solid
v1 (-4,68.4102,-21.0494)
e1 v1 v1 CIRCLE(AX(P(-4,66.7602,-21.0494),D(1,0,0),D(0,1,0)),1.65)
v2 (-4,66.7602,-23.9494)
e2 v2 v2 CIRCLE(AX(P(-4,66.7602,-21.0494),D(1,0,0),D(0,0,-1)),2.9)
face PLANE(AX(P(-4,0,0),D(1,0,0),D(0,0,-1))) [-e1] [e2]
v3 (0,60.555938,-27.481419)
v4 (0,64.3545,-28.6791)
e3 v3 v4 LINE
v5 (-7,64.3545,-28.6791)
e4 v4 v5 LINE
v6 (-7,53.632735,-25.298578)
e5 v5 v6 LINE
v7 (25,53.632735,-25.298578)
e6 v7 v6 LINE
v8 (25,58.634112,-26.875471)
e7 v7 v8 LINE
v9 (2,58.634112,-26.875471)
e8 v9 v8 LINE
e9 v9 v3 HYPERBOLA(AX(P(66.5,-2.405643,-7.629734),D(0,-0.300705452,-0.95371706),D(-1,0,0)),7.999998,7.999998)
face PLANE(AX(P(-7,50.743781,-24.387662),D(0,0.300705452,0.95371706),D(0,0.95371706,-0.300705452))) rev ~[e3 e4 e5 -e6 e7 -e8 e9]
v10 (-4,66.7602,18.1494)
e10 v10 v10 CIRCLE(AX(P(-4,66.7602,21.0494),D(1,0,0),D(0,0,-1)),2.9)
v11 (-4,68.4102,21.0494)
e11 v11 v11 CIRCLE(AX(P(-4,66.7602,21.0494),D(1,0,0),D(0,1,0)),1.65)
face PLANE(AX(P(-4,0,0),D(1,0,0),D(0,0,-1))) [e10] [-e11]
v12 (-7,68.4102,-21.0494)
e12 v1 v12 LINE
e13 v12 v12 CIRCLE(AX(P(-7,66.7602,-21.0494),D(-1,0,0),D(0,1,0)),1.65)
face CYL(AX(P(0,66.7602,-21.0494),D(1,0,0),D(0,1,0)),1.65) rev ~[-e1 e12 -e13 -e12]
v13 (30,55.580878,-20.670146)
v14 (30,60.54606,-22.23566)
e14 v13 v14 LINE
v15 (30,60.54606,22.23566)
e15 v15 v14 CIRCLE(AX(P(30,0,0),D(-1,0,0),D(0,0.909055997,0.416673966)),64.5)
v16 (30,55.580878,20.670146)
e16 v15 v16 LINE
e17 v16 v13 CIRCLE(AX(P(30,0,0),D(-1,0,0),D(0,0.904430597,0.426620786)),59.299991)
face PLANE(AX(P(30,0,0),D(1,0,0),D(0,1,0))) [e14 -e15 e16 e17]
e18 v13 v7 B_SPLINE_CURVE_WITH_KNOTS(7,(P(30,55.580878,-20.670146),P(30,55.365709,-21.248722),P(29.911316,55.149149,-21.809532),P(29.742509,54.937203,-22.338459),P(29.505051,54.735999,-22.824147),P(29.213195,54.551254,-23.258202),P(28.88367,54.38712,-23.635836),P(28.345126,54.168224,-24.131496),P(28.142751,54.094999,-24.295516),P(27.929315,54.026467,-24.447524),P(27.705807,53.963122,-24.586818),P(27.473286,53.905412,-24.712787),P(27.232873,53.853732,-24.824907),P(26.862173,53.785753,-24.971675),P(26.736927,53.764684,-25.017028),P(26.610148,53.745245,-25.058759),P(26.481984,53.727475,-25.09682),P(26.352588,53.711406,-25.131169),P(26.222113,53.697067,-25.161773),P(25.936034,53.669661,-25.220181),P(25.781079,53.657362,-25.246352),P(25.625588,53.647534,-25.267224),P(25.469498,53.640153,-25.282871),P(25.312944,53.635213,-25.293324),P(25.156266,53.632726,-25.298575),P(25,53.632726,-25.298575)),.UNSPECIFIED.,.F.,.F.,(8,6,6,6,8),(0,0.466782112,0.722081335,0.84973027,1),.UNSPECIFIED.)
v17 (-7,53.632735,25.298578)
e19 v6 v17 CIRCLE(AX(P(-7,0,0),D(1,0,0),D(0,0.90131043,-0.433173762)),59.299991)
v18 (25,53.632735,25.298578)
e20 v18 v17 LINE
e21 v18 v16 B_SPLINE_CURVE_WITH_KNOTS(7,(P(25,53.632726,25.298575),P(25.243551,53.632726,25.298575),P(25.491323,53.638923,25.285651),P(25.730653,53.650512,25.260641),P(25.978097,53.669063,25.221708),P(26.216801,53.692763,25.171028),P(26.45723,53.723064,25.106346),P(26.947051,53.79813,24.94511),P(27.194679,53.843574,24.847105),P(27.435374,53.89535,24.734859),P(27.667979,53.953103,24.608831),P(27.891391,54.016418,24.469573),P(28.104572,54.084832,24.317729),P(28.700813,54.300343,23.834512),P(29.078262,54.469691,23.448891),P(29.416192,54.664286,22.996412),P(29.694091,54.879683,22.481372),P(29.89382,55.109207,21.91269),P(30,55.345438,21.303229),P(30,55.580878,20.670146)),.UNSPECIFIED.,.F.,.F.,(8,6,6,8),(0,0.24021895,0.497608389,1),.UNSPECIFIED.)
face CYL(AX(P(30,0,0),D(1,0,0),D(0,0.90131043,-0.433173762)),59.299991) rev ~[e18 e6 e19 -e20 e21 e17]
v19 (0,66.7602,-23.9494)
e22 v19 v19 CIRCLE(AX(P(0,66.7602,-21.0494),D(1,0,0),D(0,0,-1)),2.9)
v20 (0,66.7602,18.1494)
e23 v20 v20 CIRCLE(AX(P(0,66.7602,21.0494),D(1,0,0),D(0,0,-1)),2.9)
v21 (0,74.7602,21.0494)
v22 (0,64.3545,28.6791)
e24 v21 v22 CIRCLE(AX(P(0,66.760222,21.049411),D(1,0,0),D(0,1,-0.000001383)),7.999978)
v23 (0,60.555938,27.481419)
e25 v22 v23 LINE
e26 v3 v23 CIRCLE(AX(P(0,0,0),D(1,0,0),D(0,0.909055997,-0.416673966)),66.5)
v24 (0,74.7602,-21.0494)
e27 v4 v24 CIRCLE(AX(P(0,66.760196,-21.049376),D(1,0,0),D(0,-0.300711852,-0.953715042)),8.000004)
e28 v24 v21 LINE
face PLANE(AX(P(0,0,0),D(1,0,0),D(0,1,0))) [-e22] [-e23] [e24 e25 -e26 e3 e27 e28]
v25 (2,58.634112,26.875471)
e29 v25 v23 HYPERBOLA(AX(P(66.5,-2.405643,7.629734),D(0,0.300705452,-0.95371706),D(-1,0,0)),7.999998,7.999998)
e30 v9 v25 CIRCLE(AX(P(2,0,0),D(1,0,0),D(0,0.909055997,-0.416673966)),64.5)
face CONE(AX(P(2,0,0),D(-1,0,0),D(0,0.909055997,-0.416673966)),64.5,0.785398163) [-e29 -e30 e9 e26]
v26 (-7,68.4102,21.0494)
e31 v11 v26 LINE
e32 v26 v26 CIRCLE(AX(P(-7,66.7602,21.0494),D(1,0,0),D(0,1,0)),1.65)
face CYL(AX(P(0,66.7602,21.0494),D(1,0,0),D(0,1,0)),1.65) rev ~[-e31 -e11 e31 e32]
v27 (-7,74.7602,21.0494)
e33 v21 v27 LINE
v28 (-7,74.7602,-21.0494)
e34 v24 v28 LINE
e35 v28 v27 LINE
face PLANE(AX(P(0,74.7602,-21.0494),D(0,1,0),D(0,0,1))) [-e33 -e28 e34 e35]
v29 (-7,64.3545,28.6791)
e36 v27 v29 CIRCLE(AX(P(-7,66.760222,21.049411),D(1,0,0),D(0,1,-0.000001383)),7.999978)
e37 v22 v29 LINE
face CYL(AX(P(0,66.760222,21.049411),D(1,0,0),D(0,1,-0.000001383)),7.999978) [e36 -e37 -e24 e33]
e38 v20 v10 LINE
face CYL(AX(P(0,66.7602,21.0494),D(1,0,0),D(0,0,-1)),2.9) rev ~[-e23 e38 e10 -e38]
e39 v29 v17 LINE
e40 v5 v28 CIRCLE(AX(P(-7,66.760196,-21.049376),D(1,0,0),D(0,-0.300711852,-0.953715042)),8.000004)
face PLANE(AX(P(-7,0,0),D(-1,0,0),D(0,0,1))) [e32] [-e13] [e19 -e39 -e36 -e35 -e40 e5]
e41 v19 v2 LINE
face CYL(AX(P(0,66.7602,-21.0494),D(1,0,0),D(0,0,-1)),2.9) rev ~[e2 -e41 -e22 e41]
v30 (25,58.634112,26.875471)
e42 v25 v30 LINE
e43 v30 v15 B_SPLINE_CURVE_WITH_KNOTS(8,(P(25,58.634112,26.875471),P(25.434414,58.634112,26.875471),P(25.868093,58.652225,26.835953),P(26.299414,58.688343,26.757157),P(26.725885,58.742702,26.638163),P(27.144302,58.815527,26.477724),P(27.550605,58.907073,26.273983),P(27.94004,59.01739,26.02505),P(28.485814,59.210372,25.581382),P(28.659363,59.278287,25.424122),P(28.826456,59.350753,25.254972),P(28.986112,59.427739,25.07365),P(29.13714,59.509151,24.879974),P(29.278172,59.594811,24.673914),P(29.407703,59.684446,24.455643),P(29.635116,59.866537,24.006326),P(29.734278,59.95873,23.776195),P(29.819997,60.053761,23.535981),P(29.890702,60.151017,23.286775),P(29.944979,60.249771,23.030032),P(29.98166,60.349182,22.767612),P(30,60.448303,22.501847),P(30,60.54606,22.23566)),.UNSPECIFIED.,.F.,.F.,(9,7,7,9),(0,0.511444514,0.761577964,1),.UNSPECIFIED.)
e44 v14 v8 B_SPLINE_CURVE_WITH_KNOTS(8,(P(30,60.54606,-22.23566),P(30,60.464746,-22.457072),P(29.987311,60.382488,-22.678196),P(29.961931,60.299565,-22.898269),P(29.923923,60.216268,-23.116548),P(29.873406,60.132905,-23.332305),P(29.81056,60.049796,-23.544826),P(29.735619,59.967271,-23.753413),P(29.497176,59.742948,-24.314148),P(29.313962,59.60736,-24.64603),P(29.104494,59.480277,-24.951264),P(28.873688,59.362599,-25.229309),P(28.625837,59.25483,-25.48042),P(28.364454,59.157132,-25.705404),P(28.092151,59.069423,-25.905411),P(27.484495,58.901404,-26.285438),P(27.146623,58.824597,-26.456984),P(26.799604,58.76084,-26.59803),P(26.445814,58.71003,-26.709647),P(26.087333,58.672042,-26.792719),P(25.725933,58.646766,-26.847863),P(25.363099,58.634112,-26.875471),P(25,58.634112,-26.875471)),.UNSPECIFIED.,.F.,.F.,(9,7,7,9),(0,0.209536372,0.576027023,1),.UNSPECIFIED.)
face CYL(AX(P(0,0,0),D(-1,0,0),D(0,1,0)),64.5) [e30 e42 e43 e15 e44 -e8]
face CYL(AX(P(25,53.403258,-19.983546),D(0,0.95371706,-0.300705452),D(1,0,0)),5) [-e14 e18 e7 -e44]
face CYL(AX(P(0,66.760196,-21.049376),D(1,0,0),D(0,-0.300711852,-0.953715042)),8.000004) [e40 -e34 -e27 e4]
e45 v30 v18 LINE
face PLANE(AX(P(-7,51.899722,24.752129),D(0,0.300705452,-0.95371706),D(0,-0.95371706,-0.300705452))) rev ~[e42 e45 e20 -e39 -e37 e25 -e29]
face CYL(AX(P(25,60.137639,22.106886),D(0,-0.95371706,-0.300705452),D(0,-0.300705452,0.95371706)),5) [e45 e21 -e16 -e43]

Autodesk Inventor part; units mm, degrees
ref_plane "YZ Plane" through (0, 0, 0) normal (1, 0, 0) x (0, 1, 0)
ref_plane "XZ Plane" through (0, 0, 0) normal (0, 1, 0) x (-1, 0, 0)
ref_plane "XY Plane" through (0, 0, 0) normal (0, 0, 1) x (1, 0, 0)
sketch "Sketch1" plane through (0, 0, 0) normal (1, 0, 0) x (0, 1, 0)
  circle A0 centre (0, 0) radius 70
  line L0 (0, 0) -> (66.7602, 21.0494) construction
  line L1 (66.7602, -21.0494) -> (0, 0) construction
  line L2 (66.7602, -21.0494) -> (66.7602, 21.0494) construction
  circle A1 centre (66.7602, 21.0494) radius 1.65
  circle A2 centre (66.7602, -21.0494) radius 1.65
  circle A3 centre (0, 0) radius 57.5
  line L3 (64.3545, 28.6791) -> (-26.6041, 0)
  line L4 (-26.6041, 0) -> (64.3545, -28.6791)
  line L5 (74.7602, -21.0494) -> (74.7602, 21.0494)
  arc A4 (74.7602, 21.0494) -> (64.3545, 28.6791) centre (66.7602, 21.0494) ccw
  arc A5 (64.3545, -28.6791) -> (74.7602, -21.0494) centre (66.7602, -21.0494) ccw
  circle A6 centre (0, 0) radius 64.5
  point P0 (66.7602, 0)
  point P1 (51.8997, 24.7522)
  point P2 (51.8997, -24.7522)
  point P3 (58.6341, 26.8755)
  point P4 (58.6341, -26.8755)
  dimension "d0" = 140
  dimension "d1" = 35
  dimension "d2" = 3.3
  dimension "d3" = 3.3
  dimension "d4" = 115
  dimension "d5" = 8
  dimension "d6" = 8
  dimension "d7" = 7
extrude "Extrusion1" add sketch "Sketch1" against normal blind 7 contours A0 A2 L4 A6 L3 A1 | A0 A1 L3 A4 L5 A5 L4 A2 | A6 L4 A3 L3 picked at (61.9464, 3.0696)
extrude "Extrusion2" add sketch "Sketch1" along normal blind 30 contours A6 L4 A3 L3 picked at (61.9464, 3.0696)
fillet "Fillet1" radius 5 2 edges at (30, 55.2669, 25.8138) (30, 55.2669, -25.8138)
chamfer "Chamfer1" distance 2 angle 45 1 edges at (0, 64.5, 0)
sketch "Sketch2" plane through (0, 0, 0) normal (1, 0, 0) x (0, 0, -1)
  arc A0 (27.4814, 60.5559) -> (-27.4814, 60.5559) centre (0, 0) ccw projected
  line L0 (27.4814, 60.5559) -> (28.6791, 64.3545) projected
  arc A1 (28.6791, 64.3545) -> (21.0494, 74.7602) centre (21.0494, 66.7602) ccw projected
  line L1 (21.0494, 74.7602) -> (-21.0494, 74.7602) projected
  arc A2 (-21.0494, 74.7602) -> (-28.6791, 64.3545) centre (-21.0494, 66.7602) ccw projected
  line L2 (-28.6791, 64.3545) -> (-27.4814, 60.5559) projected
  circle A3 centre (-21.0494, 66.7602) radius 1.65 projected
  circle A4 centre (21.0494, 66.7602) radius 1.65 projected
  circle A5 centre (-21.0494, 66.7602) radius 2.9
  circle A6 centre (21.0494, 66.7602) radius 2.9
  dimension "d16" = 5.8
  dimension "d17" = 5.8
extrude "Extrusion3" cut sketch "Sketch2" against normal blind 4 contours A3 | A4 | A5 | A6
sketch "Sketch3" plane through (-7, 0, 0) normal (-1, 0, 0) x (0, 0, 1)
  arc A0 (24.7522, 51.8997) -> (-24.7522, 51.8997) centre (0, 0) ccw projected
  line L0 (24.7522, 51.8997) -> (28.6791, 64.3545) projected
  arc A1 (28.6791, 64.3545) -> (21.0494, 74.7602) centre (21.0494, 66.7602) ccw projected
  line L1 (21.0494, 74.7602) -> (-21.0494, 74.7602) projected
  arc A2 (-21.0494, 74.7602) -> (-28.6791, 64.3545) centre (-21.0494, 66.7602) ccw projected
  line L2 (-28.6791, 64.3545) -> (-24.7522, 51.8997) projected
  circle A3 centre (21.0494, 66.7602) radius 1.65 projected
  circle A4 centre (-21.0494, 66.7602) radius 1.65 projected
  arc A5 (25.4764, 50.206) -> (-25.4764, 50.206) centre (0, 0) ccw
  line L3 (25.4764, 50.206) -> (29.8236, 63.9937)
  arc A6 (29.8236, 63.9937) -> (21.0494, 75.9602) centre (21.0494, 66.7602) ccw
  line L4 (21.0494, 75.9602) -> (-21.0494, 75.9602)
  arc A7 (-21.0494, 75.9602) -> (-29.8236, 63.9937) centre (-21.0494, 66.7602) ccw
  line L5 (-29.8236, 63.9937) -> (-25.4764, 50.206)
  line L6 (0, -26.6041) -> (-28.6791, 64.3545) projected
  line L7 (28.6791, 64.3545) -> (0, -26.6041) projected
  point P0 (24.3877, 50.7438)
  point P1 (-24.3877, 50.7438)
  dimension "d20" = 1.2
extrude "Extrusion4" add sketch "Sketch3" against normal blind 20 contours L7 A5 L6 A0
sketch "Sketch4" plane through (30, 0, 0) normal (1, 0, 0) x (0, 0, -1)
  line L0 (22.2357, 60.5461) -> (20.1282, 53.8619) projected
  arc A0 (22.2357, 60.5461) -> (-22.2357, 60.5461) centre (0, 0) ccw projected
  line L1 (-20.1282, 53.8619) -> (-22.2357, 60.5461) projected
  line L2 (-20.1282, 53.8619) -> (-22.2357, 60.5461) projected
  spline S0 degree 3 poles (-22.2357, 60.5461) (-22.8268, 60.329) (-23.4536, 60.088) (-24.6005, 59.6276) (-25.1209, 59.4087) (-25.9393, 59.0559) (-26.2925, 58.8984) (-26.7214, 58.7049) (-26.8341, 58.6531) (-26.8662, 58.6384) (-26.8693, 58.6369) (-26.8724, 58.6355) (-26.8755, 58.6341) knots 0.753525 0.753525 0.753525 0.753525 0.94243 0.94243 1.131336 1.131336 1.319777 1.319777 1.476719 1.476719 1.476719 1.491826 1.491826 1.491826 1.491826 projected
  line L3 (-26.8755, 58.6341) -> (-24.7522, 51.8997) projected
  line L4 (22.2357, 60.5461) -> (20.1282, 53.8619) projected
  spline S1 degree 8 poles (20.1282, 53.8619) (20.3348, 53.7847) (20.5411, 53.7066) (20.7457, 53.6281) (20.9475, 53.5496) (21.1456, 53.4716) (21.339, 53.3945) (21.5271, 53.3186) (21.9974, 53.1268) (22.2707, 53.0133) (22.5278, 52.9047) (22.768, 52.8016) (22.9911, 52.7046) (23.1973, 52.6138) (23.3871, 52.5293) (23.8704, 52.3122) (24.1287, 52.1937) (24.34, 52.0952) (24.5063, 52.0167) (24.6296, 51.9582) (24.7112, 51.9192) (24.7522, 51.8997) (24.7522, 51.8997) knots 0 0 0 0 0 0 0 0 0 0.185394 0.185394 0.185394 0.185394 0.185394 0.185394 0.185394 0.478501 0.478501 0.478501 0.478501 0.478501 0.478501 0.478501 1 1 1 1 1 1 1 1 1 projected
  line L5 (24.7522, 51.8997) -> (26.8755, 58.6341) projected
  arc A1 (24.3877, 50.7438) -> (-24.3877, 50.7438) centre (0, 0) ccw projected
  arc A2 (25.6872, 53.4477) -> (-25.6872, 53.4477) centre (0, 0) ccw
  line L6 (-24.7522, 51.8997) -> (-24.3877, 50.7438)
  line L7 (24.7522, 51.8997) -> (24.3877, 50.7438)
  point P0 (20.6702, 55.5809)
  point P1 (-25.2986, 53.6328)
  point P2 (25.2986, 53.6328)
  dimension "d23" = 3
extrude "Extrusion5" cut sketch "Sketch4" against normal through all contours A2 L5 S1 L0 | L0 S1 L7 A1 L6 L3 A2
properties part number "SEGURO_CANALETA" material "Steel, Mild, Welded"
